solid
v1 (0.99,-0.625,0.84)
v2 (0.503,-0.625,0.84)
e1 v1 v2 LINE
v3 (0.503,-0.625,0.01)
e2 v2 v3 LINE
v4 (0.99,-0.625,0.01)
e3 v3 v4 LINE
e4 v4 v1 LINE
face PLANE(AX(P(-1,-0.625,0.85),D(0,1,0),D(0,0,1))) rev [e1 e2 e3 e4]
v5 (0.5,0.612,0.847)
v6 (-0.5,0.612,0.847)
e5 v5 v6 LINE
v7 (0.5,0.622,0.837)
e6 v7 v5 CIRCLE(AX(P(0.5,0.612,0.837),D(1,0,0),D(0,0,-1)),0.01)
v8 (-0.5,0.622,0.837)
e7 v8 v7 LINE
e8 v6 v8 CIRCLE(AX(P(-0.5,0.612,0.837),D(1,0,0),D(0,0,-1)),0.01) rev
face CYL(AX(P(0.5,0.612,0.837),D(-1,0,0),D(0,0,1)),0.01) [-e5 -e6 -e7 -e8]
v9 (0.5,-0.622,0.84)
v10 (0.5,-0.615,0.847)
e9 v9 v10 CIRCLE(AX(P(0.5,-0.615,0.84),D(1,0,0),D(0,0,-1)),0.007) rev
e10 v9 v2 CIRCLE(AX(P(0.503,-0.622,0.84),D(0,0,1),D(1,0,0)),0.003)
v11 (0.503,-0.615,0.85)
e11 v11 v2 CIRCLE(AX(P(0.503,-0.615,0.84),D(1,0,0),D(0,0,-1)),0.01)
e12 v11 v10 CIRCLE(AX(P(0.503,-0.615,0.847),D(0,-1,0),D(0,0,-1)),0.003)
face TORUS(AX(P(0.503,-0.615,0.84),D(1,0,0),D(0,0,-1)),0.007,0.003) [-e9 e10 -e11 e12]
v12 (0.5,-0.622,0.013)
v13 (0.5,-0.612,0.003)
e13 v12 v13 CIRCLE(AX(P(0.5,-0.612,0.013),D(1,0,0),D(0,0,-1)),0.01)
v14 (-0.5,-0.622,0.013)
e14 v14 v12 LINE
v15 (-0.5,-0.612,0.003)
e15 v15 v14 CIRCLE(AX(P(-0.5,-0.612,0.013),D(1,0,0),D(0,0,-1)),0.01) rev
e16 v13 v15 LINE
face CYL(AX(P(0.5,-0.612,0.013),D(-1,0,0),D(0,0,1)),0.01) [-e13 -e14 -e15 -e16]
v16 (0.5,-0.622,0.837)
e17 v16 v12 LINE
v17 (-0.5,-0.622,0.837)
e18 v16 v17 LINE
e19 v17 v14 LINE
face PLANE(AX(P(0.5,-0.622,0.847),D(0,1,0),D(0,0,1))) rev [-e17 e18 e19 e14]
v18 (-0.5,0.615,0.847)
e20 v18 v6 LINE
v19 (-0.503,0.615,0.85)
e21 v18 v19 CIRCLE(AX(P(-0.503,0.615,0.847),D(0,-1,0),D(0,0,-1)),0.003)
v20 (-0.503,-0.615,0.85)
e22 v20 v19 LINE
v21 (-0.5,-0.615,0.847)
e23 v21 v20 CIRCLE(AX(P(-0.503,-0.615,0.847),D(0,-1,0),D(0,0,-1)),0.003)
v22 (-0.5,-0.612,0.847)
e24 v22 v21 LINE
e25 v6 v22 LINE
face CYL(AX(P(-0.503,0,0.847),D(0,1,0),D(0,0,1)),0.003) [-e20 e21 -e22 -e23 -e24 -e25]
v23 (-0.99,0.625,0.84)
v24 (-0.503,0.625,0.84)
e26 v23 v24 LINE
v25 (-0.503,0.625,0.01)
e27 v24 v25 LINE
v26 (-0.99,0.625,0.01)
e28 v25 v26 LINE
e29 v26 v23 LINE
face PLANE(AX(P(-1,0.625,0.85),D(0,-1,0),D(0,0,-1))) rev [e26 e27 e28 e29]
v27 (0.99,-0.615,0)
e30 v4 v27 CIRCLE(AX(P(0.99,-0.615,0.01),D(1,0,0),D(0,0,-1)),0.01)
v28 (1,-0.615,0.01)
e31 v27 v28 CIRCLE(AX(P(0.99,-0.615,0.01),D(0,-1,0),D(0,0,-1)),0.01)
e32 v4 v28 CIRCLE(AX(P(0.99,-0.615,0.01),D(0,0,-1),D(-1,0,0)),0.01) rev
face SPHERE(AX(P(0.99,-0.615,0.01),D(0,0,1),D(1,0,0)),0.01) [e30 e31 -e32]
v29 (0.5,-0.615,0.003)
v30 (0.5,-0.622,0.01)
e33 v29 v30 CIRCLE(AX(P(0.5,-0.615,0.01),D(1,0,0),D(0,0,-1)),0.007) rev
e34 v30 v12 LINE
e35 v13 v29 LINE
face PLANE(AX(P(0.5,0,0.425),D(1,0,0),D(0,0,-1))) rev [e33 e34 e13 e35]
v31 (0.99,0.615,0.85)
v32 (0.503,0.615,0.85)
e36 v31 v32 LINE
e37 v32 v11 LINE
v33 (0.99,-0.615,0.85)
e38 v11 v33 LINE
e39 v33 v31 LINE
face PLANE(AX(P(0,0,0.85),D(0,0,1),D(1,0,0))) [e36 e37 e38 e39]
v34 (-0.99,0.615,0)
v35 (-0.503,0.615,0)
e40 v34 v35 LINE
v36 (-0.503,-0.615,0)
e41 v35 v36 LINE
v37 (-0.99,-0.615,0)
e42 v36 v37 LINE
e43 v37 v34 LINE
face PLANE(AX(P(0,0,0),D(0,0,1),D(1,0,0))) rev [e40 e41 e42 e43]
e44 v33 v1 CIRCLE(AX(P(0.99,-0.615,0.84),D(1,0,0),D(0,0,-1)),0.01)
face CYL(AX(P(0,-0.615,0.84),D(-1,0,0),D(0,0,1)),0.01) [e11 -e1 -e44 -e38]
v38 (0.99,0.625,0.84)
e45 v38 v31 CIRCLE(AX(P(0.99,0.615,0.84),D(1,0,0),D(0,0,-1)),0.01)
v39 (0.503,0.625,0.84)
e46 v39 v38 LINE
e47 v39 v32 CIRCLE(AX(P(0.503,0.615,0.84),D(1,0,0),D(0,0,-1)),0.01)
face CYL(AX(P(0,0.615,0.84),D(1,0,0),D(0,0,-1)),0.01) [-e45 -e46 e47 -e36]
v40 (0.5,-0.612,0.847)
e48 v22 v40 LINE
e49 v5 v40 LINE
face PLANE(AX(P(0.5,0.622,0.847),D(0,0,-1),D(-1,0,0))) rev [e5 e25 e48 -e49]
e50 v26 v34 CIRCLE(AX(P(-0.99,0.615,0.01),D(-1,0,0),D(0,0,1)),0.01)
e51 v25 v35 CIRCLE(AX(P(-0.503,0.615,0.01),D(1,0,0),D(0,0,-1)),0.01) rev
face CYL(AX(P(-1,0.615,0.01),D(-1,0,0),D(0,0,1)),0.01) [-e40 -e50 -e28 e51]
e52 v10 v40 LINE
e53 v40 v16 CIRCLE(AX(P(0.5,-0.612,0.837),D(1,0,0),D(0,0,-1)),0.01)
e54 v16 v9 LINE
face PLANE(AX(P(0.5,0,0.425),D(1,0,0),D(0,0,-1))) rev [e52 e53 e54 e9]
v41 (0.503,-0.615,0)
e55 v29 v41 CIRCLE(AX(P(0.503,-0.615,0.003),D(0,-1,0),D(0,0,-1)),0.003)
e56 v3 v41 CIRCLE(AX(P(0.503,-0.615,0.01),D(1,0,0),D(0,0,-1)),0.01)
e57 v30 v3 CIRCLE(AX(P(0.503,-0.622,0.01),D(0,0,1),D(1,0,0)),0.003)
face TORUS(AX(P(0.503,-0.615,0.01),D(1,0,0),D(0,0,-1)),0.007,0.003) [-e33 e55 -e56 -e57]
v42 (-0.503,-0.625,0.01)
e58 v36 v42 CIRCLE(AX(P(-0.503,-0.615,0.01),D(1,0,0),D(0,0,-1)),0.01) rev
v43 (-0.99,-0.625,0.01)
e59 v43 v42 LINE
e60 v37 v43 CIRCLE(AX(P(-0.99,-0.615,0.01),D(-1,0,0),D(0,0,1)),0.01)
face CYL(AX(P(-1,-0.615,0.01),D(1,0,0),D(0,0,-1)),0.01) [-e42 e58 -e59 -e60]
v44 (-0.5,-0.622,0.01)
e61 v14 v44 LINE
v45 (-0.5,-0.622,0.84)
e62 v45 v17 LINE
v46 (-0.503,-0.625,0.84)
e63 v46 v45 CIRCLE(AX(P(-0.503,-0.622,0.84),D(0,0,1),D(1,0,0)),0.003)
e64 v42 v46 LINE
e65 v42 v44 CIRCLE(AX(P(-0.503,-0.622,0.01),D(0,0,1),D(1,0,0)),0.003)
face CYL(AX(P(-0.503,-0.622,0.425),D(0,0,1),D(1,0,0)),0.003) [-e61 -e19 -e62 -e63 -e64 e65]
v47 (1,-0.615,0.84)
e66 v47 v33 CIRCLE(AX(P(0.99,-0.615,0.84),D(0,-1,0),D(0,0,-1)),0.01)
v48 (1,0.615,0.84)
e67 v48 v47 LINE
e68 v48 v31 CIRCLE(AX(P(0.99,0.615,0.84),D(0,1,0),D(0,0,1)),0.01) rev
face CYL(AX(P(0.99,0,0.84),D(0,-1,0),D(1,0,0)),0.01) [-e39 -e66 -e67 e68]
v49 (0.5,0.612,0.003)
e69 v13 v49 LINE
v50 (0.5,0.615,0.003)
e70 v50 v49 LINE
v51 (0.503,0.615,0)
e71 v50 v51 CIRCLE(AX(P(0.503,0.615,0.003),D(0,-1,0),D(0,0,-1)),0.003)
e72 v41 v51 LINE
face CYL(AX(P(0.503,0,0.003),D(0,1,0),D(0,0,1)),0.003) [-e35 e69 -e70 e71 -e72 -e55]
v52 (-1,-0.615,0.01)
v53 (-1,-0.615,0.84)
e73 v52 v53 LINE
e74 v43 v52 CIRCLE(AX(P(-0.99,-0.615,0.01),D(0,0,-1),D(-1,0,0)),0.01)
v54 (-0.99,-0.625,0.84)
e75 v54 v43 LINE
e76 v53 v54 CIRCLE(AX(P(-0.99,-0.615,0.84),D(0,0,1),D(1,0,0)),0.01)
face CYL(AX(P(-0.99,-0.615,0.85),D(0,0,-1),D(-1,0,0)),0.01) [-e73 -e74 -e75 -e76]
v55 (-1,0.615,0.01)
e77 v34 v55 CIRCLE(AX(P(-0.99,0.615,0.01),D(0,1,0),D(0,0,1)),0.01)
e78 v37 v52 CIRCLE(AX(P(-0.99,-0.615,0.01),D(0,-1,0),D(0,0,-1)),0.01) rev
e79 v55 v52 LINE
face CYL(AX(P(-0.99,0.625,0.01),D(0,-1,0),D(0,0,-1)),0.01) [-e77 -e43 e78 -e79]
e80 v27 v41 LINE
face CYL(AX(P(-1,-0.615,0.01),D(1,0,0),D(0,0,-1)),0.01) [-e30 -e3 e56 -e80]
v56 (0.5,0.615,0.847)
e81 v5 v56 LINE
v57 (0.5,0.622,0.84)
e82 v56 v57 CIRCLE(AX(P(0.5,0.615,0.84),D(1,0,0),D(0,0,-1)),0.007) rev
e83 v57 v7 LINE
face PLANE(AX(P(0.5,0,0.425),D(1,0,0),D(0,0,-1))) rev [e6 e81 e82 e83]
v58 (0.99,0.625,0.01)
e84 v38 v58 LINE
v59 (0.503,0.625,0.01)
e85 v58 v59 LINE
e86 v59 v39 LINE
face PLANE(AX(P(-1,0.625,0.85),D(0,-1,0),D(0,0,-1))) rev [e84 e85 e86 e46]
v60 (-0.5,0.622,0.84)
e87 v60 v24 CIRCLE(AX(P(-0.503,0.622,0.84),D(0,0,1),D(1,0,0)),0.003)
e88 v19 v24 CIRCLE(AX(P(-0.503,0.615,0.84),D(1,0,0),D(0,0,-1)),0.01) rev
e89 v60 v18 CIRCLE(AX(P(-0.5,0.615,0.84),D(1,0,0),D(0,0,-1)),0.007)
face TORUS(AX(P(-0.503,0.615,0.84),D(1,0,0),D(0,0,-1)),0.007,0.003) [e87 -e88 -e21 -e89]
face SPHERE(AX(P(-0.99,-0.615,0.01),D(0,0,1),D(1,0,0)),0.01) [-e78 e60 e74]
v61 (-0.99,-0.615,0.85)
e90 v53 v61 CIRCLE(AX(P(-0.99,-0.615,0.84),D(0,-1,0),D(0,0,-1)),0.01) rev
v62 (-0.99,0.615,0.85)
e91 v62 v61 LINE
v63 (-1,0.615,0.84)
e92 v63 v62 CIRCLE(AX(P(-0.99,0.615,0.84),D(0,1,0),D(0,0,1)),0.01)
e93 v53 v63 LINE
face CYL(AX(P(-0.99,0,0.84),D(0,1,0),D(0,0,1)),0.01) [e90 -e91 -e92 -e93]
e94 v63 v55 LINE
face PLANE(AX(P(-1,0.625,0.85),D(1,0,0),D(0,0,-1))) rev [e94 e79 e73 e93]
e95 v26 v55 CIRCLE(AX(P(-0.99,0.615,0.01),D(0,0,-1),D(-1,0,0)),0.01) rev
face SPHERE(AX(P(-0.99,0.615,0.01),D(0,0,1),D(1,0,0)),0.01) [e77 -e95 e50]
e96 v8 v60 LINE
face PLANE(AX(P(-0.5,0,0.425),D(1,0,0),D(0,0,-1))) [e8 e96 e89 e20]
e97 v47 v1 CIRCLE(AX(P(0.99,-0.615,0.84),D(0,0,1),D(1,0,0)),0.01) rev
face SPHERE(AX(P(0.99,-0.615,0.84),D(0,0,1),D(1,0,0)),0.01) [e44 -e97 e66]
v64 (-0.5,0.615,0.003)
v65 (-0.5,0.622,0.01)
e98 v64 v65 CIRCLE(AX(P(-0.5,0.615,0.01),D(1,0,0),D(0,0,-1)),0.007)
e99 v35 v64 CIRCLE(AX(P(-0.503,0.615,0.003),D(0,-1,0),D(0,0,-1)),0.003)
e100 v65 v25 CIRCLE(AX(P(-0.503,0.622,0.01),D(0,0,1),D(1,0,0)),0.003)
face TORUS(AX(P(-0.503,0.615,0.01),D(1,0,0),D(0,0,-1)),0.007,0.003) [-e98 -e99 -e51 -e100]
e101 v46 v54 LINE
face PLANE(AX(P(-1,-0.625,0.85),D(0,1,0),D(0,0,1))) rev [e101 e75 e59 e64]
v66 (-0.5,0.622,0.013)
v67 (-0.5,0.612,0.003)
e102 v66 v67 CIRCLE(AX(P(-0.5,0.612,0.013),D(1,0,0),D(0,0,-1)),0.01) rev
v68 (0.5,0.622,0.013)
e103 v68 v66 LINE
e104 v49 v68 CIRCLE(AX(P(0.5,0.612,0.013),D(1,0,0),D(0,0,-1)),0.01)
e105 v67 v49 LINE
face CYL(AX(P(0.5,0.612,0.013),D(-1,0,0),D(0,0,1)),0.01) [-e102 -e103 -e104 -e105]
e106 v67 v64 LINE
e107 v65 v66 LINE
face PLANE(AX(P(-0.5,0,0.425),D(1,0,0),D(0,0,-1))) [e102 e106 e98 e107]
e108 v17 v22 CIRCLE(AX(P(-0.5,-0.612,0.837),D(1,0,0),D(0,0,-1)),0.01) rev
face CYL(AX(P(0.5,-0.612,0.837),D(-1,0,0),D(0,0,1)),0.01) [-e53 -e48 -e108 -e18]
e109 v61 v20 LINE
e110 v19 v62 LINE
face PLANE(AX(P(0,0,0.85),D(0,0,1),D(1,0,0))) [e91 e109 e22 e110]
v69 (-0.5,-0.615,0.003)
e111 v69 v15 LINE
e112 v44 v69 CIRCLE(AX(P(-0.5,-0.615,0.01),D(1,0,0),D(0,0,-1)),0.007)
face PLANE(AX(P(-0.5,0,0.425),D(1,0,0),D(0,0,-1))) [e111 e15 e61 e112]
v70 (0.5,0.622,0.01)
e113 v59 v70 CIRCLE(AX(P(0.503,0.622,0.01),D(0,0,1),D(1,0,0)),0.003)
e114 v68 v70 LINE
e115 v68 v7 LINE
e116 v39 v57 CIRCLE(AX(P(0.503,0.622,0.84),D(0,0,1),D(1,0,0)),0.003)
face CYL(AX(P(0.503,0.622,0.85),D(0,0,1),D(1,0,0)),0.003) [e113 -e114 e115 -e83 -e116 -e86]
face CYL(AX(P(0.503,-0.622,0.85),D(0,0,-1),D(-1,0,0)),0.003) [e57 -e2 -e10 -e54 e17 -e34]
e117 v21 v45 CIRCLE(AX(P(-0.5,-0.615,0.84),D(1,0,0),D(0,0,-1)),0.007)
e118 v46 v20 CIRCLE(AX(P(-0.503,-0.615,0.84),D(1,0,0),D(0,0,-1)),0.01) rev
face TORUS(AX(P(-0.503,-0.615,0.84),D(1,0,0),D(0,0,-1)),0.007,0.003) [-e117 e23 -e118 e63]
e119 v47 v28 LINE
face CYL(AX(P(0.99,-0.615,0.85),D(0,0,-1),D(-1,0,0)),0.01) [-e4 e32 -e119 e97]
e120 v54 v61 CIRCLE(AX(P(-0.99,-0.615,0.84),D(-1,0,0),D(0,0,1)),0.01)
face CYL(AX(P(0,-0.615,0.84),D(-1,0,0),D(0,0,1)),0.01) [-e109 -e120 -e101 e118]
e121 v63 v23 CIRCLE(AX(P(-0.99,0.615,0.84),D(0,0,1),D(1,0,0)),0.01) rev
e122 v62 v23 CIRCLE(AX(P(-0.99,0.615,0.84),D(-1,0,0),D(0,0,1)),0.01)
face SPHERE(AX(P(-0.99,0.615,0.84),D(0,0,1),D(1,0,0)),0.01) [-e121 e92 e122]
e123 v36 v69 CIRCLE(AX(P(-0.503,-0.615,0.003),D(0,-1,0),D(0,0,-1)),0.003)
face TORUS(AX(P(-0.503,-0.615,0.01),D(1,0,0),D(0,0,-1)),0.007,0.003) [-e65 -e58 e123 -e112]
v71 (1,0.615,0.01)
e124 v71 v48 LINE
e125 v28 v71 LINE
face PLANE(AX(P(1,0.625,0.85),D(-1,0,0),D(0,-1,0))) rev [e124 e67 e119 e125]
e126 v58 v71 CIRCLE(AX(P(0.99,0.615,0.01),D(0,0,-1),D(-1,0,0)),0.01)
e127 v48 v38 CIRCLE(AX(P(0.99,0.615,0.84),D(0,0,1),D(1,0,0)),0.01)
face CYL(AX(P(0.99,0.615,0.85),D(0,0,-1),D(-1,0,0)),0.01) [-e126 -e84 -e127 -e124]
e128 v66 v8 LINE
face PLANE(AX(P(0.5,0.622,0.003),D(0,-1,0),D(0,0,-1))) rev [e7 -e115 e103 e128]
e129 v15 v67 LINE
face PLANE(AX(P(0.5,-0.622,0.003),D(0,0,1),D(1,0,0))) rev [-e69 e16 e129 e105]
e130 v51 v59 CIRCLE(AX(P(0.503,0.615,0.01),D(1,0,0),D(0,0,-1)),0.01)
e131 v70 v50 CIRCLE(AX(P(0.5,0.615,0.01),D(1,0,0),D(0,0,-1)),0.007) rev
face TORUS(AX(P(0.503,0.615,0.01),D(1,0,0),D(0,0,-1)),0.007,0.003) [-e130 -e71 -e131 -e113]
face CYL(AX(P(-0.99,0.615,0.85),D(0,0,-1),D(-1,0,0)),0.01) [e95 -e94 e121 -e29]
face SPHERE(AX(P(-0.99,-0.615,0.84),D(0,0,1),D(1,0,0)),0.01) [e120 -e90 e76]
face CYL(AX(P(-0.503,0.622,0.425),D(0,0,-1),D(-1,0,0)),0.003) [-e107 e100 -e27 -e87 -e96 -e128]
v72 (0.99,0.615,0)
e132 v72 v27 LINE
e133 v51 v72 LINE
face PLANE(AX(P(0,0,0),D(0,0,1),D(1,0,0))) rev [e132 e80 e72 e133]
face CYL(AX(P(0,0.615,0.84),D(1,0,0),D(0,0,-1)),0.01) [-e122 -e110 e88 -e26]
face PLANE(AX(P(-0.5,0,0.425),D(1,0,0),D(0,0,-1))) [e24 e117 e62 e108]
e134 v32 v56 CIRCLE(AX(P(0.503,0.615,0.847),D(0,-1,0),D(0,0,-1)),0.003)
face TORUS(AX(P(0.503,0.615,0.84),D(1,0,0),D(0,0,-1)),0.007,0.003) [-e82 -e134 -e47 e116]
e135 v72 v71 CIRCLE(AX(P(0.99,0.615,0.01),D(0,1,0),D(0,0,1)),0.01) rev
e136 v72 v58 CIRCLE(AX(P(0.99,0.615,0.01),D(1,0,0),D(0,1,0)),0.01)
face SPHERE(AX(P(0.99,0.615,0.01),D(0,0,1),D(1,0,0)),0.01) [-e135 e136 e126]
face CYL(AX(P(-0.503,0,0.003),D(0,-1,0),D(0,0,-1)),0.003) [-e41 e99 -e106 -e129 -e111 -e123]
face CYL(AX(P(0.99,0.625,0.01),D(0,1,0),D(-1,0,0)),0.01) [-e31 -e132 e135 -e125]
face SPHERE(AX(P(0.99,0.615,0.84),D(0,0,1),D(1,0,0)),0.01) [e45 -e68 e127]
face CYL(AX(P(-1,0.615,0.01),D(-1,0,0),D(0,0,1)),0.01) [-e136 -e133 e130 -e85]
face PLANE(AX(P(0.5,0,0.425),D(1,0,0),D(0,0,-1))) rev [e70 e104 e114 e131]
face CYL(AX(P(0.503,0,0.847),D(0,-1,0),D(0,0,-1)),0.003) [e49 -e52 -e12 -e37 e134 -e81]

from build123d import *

# Parameters (mm, degrees)
SKETCH1_W                           = 2
SKETCH1_H                           = 1.25
ALL_BODY_DEPTH                      = 0.85
CUT_OUT_THE_BODY_FOR_PIN_DEPTH      = 0.5
CUT_OUT_THE_BODY_FOR_PIN_DEPTH_BACK = 0.5
SKETCH2_OUTSIDE_W                   = 3.352
SKETCH2_OUTSIDE_H                   = 3.752
SKETCH2_OUTSIDE_W_2                 = 0.844
SKETCH2_OUTSIDE_H_2                 = 1.244
BODY_FILLET_R                       = 0.01
PIN_FILLET_A_R                      = 0.01
PIN_FILLET_B_R                      = 0.003


with BuildPart() as part:
    # Sketch1 → All body (new body)
    with BuildSketch(Plane.XY):
        Rectangle(SKETCH1_W, SKETCH1_H)
    extrude(amount=ALL_BODY_DEPTH)

    # Sketch2 outside → Cut out the body for pin (cut, two sides: drawn at the far end of the back side and taken through both)
    with BuildSketch(Plane(origin=(0, 0, 0), x_dir=(0, 0, -1), z_dir=(1, 0, 0)).offset(-CUT_OUT_THE_BODY_FOR_PIN_DEPTH_BACK)):
        with Locations((-0.425, 0)):
            Rectangle(SKETCH2_OUTSIDE_W, SKETCH2_OUTSIDE_H)
        with Locations((-0.425, 0)):
            Rectangle(SKETCH2_OUTSIDE_W_2, SKETCH2_OUTSIDE_H_2, mode=Mode.SUBTRACT)
    extrude(amount=CUT_OUT_THE_BODY_FOR_PIN_DEPTH + CUT_OUT_THE_BODY_FOR_PIN_DEPTH_BACK, mode=Mode.SUBTRACT)

    # Body fillet
    body_fillet_edges = [part.edges().sort_by_distance(p)[0] for p in [
        (0, 0.622, 0.003),
        (0, 0.622, 0.847),
        (0, -0.622, 0.847),
        (0, -0.622, 0.003),
    ]]
    fillet(body_fillet_edges, radius=BODY_FILLET_R)

    # Pin fillet a
    pin_fillet_a_edges = [part.edges().sort_by_distance(p)[0] for p in [
        (1, 0, 0.85),
        (-0.75, 0.625, 0),
        (0.75, -0.625, 0),
        (0.75, -0.625, 0.85),
        (-0.75, 0.625, 0.85),
        (0.75, 0.625, 0.85),
        (-1, 0, 0.85),
        (0.75, 0.625, 0),
        (1, 0, 0),
        (-0.75, -0.625, 0),
        (-1, 0, 0),
        (-1, 0.625, 0.425),
        (1, 0.625, 0.425),
        (1, -0.625, 0.425),
        (-1, -0.625, 0.425),
        (-0.75, -0.625, 0.85),
    ]]
    fillet(pin_fillet_a_edges, radius=PIN_FILLET_A_R)

    # Pin fillet b
    pin_fillet_b_edges = [part.edges().sort_by_distance(p)[0] for p in [
        (0.5, -0.625, 0.425),
        (0.5, 0, 0.85),
        (0.5, 0.625, 0.425),
        (0.5, 0, 0),
        (-0.5, 0.625, 0.425),
        (-0.5, 0, 0.85),
        (-0.5, -0.625, 0.425),
        (-0.5, 0, 0),
        (0.5, 0.622071068, 0.002928932),
        (0.5, -0.622071068, 0.002928932),
        (0.5, -0.622071068, 0.847071068),
        (0.5, 0.622071068, 0.847071068),
        (-0.5, -0.622071068, 0.847071068),
        (-0.5, 0.622071068, 0.847071068),
        (-0.5, -0.622071068, 0.002928932),
        (-0.5, 0.622071068, 0.002928932),
    ]]
    fillet(pin_fillet_b_edges, radius=PIN_FILLET_B_R - 0.0001)  # a hair under: the kernel refuses the full size


solid = part.part
